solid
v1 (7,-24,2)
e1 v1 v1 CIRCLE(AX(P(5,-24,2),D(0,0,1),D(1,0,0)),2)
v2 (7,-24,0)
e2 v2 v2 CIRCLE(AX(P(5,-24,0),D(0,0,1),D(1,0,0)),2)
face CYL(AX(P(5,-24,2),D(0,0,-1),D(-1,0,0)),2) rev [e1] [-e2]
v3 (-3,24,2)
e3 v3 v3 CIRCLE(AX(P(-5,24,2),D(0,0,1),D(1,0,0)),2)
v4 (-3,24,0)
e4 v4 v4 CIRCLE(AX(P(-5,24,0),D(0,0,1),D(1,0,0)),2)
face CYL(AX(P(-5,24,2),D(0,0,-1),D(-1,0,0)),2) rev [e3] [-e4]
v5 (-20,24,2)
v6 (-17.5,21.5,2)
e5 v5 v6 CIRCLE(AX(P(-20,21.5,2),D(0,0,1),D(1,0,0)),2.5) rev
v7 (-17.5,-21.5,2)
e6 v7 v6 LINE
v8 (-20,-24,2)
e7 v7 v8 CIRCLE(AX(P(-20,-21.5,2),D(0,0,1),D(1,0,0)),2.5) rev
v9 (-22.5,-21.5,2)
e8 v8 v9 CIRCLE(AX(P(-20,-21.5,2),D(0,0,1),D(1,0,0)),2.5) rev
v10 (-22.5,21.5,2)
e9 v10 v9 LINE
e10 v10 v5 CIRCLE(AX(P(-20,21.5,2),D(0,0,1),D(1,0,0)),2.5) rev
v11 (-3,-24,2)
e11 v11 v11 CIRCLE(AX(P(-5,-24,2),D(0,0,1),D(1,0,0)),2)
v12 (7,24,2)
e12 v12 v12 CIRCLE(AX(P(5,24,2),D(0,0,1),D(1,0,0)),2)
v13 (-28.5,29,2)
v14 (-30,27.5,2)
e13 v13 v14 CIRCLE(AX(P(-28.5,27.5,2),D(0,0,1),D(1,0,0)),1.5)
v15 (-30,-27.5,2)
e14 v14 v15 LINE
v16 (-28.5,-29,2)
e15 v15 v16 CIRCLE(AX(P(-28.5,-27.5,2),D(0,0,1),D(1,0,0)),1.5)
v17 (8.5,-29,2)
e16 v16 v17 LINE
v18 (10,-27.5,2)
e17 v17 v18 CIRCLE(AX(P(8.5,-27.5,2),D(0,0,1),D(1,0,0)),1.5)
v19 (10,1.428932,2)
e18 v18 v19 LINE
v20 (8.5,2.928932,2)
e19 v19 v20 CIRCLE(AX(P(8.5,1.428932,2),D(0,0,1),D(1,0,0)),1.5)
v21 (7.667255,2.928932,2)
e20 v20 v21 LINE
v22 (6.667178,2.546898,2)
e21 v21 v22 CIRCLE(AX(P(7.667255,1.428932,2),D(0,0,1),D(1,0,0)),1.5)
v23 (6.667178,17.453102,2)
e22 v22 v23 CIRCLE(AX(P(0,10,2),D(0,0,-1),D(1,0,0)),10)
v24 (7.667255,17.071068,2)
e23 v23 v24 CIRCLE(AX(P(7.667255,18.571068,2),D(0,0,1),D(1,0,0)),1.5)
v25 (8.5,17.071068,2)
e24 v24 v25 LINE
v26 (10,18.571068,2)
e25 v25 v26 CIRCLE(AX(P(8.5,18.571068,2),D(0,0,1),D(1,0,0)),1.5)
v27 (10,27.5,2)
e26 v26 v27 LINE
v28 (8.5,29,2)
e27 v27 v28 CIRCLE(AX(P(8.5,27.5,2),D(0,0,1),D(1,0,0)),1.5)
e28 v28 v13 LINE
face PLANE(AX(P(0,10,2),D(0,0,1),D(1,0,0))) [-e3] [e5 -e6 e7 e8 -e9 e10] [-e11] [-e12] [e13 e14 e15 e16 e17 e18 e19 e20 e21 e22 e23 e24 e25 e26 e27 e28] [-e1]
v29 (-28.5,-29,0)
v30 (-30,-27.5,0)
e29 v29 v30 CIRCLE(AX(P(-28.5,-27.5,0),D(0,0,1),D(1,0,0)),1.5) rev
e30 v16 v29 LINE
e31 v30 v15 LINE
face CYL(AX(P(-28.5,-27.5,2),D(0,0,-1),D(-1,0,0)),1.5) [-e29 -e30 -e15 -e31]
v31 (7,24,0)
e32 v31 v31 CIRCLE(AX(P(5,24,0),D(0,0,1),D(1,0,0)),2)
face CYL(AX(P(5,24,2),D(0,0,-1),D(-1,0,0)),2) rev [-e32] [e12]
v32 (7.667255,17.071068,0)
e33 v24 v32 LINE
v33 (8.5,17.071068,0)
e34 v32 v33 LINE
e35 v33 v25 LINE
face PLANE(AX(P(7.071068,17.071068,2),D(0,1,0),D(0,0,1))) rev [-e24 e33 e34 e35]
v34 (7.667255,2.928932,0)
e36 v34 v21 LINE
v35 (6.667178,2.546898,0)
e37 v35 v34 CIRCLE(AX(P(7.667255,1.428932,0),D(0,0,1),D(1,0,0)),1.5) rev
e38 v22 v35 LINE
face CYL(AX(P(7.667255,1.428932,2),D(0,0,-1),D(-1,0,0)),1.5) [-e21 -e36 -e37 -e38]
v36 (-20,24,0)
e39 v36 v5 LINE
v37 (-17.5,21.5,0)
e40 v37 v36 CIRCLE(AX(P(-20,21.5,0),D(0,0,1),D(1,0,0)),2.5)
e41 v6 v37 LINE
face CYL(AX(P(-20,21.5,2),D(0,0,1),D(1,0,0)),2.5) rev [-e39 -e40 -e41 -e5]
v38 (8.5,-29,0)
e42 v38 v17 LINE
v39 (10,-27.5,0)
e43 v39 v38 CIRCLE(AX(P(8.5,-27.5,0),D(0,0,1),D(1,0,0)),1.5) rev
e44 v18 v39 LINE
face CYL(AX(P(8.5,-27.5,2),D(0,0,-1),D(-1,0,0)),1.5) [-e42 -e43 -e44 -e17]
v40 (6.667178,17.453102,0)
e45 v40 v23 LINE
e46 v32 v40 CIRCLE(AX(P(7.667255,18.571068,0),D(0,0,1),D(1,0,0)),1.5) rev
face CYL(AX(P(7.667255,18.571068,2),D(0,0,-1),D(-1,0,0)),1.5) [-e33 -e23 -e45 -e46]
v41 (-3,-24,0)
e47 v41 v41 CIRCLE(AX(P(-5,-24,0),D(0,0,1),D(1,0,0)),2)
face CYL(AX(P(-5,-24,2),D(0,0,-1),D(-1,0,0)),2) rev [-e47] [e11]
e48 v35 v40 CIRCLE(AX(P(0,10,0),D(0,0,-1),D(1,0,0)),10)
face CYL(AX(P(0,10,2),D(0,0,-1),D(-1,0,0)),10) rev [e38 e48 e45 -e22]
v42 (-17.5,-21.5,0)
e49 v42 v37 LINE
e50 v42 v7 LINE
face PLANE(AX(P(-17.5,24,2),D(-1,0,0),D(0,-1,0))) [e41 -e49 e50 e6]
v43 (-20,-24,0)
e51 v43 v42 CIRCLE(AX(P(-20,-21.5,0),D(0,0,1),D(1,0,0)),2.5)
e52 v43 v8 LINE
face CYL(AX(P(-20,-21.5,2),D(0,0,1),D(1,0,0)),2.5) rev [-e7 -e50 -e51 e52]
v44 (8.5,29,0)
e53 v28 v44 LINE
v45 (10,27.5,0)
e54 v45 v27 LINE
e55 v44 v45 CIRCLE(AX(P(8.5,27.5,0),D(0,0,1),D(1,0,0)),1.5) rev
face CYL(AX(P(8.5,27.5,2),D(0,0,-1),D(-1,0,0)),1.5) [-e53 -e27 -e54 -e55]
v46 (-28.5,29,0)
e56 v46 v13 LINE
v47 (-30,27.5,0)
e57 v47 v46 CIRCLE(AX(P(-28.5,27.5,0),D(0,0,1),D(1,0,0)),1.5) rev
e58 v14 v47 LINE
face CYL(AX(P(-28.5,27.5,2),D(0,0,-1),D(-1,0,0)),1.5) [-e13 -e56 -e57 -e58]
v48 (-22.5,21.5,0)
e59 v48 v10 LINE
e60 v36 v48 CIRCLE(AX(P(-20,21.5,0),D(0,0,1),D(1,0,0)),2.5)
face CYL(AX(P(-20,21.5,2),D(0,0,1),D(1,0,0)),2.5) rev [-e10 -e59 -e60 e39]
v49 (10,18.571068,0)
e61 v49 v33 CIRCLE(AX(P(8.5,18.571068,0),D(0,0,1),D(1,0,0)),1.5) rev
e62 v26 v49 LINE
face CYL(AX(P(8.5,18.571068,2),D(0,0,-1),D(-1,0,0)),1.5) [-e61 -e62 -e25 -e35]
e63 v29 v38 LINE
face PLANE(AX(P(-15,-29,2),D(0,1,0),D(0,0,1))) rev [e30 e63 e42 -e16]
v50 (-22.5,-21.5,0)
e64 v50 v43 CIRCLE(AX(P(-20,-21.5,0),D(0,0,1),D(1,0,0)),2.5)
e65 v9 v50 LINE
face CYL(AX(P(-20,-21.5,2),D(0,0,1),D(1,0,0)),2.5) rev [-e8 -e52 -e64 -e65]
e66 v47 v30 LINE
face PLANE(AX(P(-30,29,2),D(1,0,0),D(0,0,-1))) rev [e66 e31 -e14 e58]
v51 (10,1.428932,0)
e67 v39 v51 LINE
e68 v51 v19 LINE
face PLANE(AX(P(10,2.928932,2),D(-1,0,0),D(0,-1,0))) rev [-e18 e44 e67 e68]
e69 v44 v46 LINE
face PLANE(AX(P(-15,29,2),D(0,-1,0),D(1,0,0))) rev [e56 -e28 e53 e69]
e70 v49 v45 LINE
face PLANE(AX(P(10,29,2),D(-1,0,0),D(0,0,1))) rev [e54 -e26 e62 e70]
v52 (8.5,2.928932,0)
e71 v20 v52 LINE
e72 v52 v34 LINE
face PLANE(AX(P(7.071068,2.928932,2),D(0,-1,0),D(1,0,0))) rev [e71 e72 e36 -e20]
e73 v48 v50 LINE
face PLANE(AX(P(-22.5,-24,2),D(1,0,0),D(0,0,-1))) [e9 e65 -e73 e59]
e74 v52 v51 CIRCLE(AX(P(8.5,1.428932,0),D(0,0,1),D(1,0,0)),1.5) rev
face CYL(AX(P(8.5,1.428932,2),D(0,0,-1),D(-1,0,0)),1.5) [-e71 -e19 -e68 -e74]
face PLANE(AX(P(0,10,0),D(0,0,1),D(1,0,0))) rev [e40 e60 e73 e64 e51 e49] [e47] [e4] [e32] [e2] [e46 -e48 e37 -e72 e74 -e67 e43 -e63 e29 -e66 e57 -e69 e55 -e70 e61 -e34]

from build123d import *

# Parameters (mm, degrees)
SKETCH_1_R      = 2
EXTRUDE_1_DEPTH = 2
FILLET_1_R      = 1.5
FILLET_2_R      = 2.5


with BuildPart() as part:
    # 草图1 → 凸台-拉伸1 (new body)
    with BuildSketch(Plane.XY):
        with BuildLine():
            Line((7.071067812, 17.071067812), (10, 17.071067812))
            Line((10, 17.071067812), (10, 29))
            Line((10, 29), (-15, 29))
            Line((-15, 29), (-30, 29))
            Line((-30, 29), (-30, -29))
            Line((-30, -29), (-15, -29))
            Line((-15, -29), (10, -29))
            Line((10, -29), (10, 2.928932188))
            Line((10, 2.928932188), (7.071067812, 2.928932188))
            ThreePointArc((7.071067812, 2.928932188), (-10, 10), (7.071067812, 17.071067812))
        make_face()
        with Locations((5, -24)):
            Circle(SKETCH_1_R, mode=Mode.SUBTRACT)
        with Locations((-5, -24)):
            Circle(SKETCH_1_R, mode=Mode.SUBTRACT)
        with Locations((-5, 24)):
            Circle(SKETCH_1_R, mode=Mode.SUBTRACT)
        with Locations((5, 24)):
            Circle(SKETCH_1_R, mode=Mode.SUBTRACT)
        Polygon((-20, 24), (-17.5, 24), (-17.5, -24), (-22.5, -24), (-22.5, 24), align=None, mode=Mode.SUBTRACT)
    extrude(amount=EXTRUDE_1_DEPTH)

    # 圆角1
    fillet_1_edges = [part.edges().sort_by_distance(p)[0] for p in [
        (7.071067812, 2.928932188, 1),
        (10, 2.928932188, 1),
        (10, -29, 1),
        (-30, -29, 1),
        (-30, 29, 1),
        (10, 29, 1),
        (10, 17.071067812, 1),
        (7.071067812, 17.071067812, 1),
    ]]
    fillet(fillet_1_edges, radius=FILLET_1_R)

    # 圆角2
    fillet_2_edges = [part.edges().sort_by_distance(p)[0] for p in [
        (-17.5, -24, 1),
        (-22.5, -24, 1),
        (-22.5, 24, 1),
        (-17.5, 24, 1),
    ]]
    fillet(fillet_2_edges, radius=FILLET_2_R - 0.0001)  # a hair under: the kernel refuses the full size


solid = part.part
